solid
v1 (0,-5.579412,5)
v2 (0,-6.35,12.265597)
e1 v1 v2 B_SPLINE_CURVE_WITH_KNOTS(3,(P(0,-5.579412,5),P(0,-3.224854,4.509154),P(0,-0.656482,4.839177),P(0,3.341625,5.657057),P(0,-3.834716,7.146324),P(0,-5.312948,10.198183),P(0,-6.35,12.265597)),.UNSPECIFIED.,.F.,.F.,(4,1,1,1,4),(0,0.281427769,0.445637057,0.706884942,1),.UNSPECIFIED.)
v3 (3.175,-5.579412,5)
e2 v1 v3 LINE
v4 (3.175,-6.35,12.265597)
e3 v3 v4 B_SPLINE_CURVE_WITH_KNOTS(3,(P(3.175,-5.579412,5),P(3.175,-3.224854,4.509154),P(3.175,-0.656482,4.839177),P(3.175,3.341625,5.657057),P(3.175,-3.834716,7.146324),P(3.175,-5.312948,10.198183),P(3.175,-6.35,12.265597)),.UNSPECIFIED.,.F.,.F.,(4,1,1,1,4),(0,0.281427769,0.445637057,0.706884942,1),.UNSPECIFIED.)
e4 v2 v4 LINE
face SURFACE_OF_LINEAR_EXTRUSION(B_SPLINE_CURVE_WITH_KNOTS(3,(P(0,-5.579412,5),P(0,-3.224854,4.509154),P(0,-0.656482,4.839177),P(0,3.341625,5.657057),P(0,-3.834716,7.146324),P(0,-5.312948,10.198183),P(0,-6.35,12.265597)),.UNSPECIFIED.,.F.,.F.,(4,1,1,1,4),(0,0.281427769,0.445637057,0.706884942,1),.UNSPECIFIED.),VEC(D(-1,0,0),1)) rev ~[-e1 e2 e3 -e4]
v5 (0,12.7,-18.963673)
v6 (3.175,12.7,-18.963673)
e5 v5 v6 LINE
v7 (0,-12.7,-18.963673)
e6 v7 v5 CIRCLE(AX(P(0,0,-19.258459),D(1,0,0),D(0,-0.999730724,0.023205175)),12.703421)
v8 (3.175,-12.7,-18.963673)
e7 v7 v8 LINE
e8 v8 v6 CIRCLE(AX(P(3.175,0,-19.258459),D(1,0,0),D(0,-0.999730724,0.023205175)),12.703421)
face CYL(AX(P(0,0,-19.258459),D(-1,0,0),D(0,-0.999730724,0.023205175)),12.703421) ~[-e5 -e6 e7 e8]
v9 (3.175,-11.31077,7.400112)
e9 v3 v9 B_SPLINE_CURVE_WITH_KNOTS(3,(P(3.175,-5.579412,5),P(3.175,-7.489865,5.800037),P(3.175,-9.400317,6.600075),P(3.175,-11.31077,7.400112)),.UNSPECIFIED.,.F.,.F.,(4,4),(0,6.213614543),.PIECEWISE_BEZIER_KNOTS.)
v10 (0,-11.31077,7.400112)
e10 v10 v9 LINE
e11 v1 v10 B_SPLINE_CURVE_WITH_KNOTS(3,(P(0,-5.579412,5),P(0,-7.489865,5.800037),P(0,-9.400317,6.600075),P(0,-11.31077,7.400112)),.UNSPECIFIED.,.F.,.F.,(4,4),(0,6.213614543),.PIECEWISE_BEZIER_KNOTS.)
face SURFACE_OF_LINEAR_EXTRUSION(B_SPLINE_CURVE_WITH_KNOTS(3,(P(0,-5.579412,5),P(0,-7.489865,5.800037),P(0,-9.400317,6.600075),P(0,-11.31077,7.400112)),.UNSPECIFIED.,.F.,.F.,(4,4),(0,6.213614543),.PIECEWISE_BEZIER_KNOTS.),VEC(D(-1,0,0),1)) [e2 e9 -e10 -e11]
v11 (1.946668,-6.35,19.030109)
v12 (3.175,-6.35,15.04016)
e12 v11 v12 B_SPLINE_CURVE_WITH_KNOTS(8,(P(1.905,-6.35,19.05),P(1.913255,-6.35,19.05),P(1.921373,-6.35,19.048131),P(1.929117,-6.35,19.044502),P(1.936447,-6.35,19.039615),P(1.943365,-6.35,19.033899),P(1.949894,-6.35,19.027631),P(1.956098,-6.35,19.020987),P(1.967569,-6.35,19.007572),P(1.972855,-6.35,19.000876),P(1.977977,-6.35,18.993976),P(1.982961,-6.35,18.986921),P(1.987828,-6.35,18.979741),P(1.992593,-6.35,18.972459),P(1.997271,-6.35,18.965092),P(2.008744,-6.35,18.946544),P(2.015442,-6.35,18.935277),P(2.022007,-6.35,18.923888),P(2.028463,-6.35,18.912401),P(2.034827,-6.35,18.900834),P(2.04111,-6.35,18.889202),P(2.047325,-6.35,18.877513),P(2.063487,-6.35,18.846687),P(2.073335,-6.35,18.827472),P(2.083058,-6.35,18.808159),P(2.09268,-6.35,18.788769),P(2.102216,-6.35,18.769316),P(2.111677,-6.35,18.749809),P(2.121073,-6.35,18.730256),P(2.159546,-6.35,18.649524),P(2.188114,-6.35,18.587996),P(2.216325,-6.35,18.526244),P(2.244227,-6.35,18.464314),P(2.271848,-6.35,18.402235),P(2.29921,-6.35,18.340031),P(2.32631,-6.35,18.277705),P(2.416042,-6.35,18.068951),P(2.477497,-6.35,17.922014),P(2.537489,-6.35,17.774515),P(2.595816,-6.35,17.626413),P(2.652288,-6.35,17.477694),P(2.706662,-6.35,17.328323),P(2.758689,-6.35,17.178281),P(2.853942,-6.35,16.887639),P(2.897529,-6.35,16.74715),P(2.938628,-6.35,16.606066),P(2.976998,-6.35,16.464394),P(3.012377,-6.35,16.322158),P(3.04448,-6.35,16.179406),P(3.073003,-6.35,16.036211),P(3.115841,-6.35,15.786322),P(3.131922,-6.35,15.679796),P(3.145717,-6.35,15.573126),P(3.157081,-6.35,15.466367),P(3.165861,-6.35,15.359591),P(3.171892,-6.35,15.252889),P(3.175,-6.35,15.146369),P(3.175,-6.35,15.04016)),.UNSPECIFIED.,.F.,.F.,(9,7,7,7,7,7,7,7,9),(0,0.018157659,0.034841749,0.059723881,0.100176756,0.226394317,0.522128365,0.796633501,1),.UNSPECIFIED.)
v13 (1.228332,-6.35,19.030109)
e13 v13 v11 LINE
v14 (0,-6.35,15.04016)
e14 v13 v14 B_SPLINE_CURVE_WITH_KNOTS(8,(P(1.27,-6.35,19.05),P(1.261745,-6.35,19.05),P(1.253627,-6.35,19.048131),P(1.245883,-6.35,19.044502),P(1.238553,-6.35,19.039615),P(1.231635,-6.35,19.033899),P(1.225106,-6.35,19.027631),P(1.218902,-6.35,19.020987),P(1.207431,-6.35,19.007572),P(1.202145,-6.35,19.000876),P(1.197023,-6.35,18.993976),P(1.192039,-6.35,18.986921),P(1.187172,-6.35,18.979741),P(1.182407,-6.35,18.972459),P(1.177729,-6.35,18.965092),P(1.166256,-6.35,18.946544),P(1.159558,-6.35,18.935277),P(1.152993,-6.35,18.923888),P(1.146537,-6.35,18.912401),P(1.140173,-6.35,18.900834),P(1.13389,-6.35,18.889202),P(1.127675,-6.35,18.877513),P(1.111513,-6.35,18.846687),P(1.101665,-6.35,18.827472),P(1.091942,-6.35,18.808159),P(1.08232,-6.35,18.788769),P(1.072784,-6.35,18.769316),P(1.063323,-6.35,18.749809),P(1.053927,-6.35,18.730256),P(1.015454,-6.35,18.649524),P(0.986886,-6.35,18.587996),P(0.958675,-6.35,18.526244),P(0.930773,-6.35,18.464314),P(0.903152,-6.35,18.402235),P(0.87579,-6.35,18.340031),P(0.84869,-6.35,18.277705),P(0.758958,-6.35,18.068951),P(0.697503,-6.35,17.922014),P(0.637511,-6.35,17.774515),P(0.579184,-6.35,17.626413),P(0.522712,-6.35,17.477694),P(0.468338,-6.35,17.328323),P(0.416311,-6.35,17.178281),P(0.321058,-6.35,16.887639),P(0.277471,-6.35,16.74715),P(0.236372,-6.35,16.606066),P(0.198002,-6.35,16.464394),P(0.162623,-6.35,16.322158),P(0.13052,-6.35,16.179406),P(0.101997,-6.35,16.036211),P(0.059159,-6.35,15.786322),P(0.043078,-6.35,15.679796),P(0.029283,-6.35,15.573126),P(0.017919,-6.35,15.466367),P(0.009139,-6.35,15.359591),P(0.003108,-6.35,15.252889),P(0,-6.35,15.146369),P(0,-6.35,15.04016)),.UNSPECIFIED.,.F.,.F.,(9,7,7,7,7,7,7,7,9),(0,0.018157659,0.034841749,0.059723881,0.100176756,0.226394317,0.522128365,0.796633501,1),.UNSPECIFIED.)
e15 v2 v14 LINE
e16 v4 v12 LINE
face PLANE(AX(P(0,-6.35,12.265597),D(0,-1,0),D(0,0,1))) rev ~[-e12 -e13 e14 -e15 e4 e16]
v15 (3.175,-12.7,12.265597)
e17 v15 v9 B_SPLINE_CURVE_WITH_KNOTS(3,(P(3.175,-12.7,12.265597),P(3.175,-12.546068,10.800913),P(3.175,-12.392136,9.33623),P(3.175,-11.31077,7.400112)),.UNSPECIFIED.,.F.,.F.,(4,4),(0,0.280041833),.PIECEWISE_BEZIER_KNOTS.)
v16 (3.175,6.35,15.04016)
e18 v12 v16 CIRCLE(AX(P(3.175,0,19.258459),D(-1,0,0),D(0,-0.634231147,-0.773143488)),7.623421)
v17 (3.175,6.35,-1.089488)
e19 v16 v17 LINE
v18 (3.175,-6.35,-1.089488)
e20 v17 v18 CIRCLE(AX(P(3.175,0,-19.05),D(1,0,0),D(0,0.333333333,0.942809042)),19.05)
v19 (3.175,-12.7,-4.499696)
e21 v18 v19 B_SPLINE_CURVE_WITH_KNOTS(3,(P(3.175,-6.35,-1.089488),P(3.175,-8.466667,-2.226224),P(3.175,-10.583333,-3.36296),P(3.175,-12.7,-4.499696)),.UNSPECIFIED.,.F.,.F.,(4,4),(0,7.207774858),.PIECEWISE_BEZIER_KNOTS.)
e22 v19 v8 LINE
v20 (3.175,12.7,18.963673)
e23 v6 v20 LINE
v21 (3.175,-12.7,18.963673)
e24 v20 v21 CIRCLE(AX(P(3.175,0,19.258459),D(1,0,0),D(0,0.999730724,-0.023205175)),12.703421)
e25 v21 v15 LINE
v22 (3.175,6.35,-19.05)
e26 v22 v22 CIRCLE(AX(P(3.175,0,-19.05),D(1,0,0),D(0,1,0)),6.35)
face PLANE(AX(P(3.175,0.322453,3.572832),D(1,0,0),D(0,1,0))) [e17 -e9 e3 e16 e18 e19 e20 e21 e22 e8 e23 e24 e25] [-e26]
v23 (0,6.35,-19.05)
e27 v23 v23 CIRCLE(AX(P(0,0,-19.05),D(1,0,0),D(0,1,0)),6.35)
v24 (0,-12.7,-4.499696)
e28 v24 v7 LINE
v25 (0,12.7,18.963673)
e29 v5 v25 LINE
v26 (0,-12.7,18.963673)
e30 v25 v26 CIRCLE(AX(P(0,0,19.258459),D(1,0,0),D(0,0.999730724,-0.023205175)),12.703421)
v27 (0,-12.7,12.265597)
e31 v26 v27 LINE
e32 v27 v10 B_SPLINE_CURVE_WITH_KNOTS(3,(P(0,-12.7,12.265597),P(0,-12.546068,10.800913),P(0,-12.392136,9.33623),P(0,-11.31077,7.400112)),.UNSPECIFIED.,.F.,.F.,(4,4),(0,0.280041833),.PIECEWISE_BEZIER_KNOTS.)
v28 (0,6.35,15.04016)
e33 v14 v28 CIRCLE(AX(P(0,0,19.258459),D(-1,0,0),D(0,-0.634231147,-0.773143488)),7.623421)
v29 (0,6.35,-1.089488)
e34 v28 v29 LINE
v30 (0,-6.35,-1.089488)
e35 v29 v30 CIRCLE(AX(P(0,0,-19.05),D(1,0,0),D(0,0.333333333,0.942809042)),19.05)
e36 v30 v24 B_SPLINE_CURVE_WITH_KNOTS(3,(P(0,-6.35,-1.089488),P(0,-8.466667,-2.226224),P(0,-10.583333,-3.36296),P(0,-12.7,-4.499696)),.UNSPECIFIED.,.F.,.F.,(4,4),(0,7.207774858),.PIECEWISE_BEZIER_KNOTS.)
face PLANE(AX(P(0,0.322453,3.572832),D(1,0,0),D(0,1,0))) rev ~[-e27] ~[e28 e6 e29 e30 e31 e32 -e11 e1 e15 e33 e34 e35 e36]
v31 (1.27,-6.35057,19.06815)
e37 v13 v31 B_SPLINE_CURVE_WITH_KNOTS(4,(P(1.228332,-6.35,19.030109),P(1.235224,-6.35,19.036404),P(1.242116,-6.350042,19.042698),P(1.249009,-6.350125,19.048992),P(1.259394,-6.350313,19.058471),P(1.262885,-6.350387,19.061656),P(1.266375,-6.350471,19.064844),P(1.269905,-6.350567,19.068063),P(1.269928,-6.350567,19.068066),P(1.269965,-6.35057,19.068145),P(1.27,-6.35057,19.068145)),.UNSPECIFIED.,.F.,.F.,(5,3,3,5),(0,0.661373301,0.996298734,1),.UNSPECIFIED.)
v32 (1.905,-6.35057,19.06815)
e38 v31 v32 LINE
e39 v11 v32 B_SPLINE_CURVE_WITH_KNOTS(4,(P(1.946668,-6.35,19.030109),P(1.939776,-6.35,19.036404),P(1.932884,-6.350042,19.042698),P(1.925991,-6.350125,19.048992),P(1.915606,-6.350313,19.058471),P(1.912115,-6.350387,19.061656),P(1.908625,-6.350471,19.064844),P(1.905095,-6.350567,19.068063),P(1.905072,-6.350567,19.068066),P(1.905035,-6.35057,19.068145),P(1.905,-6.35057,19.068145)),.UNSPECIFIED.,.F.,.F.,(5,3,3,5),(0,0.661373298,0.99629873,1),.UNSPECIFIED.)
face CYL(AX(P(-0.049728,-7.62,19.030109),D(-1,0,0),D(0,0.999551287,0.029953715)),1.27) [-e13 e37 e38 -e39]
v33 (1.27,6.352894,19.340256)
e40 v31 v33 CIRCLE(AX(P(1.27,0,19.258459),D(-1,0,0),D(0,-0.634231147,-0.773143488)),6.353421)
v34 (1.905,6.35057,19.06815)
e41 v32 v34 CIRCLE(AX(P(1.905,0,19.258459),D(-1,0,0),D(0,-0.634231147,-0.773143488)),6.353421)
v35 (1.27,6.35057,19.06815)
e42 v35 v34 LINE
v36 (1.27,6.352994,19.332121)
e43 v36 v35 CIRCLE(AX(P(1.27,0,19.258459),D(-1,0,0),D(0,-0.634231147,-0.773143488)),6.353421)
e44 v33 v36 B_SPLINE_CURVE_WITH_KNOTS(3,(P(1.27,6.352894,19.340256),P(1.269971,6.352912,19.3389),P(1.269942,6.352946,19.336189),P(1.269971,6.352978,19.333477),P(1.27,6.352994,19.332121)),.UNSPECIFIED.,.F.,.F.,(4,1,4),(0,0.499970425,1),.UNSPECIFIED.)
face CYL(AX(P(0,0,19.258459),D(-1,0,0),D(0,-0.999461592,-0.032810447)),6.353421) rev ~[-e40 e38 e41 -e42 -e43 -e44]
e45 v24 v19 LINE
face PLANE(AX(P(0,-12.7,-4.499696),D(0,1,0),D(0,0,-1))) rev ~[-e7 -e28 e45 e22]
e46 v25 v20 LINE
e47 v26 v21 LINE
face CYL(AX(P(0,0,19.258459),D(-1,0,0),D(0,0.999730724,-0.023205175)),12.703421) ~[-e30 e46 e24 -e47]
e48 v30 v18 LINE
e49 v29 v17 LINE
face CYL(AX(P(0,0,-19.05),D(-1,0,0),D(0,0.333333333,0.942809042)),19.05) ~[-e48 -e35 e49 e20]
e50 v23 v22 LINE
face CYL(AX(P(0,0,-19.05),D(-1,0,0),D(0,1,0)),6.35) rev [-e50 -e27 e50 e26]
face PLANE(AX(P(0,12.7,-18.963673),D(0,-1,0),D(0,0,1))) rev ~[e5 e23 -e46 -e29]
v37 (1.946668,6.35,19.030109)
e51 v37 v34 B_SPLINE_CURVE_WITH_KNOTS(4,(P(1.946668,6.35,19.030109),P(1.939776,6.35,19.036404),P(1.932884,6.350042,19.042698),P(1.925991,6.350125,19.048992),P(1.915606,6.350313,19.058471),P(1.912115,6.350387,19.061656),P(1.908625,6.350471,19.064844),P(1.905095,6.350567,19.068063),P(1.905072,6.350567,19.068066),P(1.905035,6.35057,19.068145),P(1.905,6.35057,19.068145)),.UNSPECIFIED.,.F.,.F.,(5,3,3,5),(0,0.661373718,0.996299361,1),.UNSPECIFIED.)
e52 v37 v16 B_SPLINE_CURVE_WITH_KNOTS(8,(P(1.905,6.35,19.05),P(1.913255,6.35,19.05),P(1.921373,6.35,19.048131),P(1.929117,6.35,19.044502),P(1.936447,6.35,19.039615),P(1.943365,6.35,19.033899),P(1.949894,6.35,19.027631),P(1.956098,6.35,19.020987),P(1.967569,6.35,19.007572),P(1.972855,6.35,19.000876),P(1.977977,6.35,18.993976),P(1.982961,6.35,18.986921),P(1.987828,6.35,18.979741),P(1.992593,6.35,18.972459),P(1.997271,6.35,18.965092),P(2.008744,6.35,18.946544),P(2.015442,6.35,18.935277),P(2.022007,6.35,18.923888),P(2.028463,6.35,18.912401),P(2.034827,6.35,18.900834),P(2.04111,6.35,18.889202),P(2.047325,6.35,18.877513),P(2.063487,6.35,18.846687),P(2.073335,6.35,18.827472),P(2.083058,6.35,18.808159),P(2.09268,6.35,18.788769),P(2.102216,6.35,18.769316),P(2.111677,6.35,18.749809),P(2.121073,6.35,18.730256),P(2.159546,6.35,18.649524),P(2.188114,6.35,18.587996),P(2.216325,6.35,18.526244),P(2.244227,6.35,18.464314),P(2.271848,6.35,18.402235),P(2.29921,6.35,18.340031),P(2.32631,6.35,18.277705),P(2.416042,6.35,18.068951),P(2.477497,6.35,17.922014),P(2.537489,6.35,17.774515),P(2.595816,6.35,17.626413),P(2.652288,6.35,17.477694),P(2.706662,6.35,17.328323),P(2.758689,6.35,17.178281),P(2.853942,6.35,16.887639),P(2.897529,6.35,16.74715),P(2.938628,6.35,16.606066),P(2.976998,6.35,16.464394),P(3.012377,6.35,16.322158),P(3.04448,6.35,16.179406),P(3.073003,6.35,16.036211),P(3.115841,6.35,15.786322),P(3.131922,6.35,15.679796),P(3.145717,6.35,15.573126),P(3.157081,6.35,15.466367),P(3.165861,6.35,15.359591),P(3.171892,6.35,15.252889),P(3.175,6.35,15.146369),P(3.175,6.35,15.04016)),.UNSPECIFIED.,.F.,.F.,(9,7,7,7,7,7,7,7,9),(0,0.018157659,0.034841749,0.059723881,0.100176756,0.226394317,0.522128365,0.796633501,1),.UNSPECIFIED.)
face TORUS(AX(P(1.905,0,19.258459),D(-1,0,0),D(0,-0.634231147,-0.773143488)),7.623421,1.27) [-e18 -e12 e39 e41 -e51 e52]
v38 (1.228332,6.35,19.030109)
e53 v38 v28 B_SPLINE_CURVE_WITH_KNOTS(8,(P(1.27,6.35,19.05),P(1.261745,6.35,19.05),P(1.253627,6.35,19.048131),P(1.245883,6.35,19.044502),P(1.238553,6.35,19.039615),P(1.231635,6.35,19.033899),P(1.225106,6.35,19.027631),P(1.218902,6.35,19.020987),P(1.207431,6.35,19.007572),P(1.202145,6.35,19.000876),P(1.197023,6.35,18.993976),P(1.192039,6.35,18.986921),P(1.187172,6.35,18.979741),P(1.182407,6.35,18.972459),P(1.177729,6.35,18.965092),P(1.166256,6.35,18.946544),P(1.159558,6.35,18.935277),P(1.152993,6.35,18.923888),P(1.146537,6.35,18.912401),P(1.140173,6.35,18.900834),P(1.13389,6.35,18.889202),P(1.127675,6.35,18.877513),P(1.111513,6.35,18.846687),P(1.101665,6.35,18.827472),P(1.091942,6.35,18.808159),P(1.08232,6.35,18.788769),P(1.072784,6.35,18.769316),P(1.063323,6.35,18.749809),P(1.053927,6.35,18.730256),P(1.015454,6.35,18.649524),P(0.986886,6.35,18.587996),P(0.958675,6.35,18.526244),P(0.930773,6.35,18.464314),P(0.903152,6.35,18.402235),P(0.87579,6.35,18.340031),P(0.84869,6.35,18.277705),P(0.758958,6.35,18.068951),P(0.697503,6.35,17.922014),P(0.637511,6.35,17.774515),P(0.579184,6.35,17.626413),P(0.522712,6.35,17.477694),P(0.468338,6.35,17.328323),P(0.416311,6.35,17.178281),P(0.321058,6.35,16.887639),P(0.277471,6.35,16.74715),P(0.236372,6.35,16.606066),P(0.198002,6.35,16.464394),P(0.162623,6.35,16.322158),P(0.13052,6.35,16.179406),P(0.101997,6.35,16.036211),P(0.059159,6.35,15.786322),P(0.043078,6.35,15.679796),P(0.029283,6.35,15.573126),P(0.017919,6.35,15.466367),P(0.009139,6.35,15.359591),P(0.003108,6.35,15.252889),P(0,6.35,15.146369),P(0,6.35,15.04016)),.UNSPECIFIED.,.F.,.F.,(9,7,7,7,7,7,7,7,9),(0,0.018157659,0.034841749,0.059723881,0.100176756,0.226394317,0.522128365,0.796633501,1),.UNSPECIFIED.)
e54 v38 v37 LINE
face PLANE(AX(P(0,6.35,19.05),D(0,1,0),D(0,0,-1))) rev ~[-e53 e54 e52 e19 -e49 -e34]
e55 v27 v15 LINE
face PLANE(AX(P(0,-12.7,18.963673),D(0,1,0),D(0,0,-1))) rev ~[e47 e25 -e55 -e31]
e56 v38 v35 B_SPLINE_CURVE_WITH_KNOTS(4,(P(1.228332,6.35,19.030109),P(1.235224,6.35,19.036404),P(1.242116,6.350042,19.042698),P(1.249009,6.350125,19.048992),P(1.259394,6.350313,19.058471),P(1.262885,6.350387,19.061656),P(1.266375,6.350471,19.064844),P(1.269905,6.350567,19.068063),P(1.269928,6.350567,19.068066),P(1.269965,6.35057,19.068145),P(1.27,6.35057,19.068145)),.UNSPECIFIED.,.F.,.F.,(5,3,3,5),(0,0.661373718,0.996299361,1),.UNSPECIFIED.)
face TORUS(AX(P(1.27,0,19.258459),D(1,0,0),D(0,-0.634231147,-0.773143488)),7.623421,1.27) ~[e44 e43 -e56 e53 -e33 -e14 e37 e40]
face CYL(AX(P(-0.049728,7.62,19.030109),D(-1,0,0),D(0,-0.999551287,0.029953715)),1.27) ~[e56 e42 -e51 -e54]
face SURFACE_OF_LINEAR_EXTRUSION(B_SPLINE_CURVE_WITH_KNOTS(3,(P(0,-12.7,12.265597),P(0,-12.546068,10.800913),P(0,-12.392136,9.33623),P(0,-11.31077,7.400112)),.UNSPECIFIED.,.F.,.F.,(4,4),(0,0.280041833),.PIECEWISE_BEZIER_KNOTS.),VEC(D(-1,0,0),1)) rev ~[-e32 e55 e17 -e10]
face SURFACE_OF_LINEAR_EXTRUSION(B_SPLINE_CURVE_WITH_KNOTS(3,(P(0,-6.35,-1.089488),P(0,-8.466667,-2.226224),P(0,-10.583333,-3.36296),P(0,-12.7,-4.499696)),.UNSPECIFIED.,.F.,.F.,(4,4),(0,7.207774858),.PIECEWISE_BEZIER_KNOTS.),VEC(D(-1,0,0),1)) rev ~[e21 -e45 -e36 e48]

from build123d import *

# Parameters (mm, degrees)
F0_R        = 6.35
F1_DEPTH    = 3.175
F2_T1_DEPTH = 3.2744561413
F2_T4_ANGLE = 281.2740332969
F2_T6_ANGLE = 281.2740332969


# Not quite as in the source:
# - a fillet or chamfer that OpenCascade refuses, or shapes differently, is made with other operations: its cross-section is extruded or revolved along the edge and cut away or added


with BuildPart() as f1:
    # F0 (on Right) → F1 (new body)
    with BuildSketch(Plane.YZ):
        with BuildLine():
            Line((6.35, 19.05), (6.35, -1.0894877579))
            ThreePointArc((6.35, -1.0894877579), (0, 0), (-6.35, -1.0894877579))
            add(Edge.make_bspline(
                [(-6.35, -1.0894877579), (-8.4666666667, -2.2262237484), (-10.5833333333, -3.3629597389), (-12.7, -4.4996957295)],
                knots=[0, 0, 0, 0, 7.2077748584, 7.2077748584, 7.2077748584, 7.2077748584], degree=3))
            Line((-12.7, -4.4996957295), (-12.7, -18.9636734782))
            ThreePointArc((-12.7, -18.9636734782), (0, -31.9618793041), (12.7, -18.9636734782))
            Line((12.7, -18.9636734782), (12.7, 18.9636734782))
            ThreePointArc((12.7, 18.9636734782), (0, 31.9618793041), (-12.7, 18.9636734782))
            Line((-12.7, 18.9636734782), (-12.7, 12.2655965388))
            add(Edge.make_bspline(
                [(-12.7, 12.2655965388), (-12.5460680886, 10.8009133444), (-12.3921361771, 9.3362301501), (-11.3107701764, 7.4001117609)],
                knots=[0, 0, 0, 0, 0.2800418332, 0.2800418332, 0.2800418332, 0.2800418332], degree=3))
            add(Edge.make_bspline(
                [(-5.5794117662, 5), (-7.4898645696, 5.8000372536), (-9.400317373, 6.6000745073), (-11.3107701764, 7.4001117609)],
                knots=[0, 0, 0, 0, 6.2136145432, 6.2136145432, 6.2136145432, 6.2136145432], degree=3))
            add(Edge.make_bspline(
                [(-5.5794117662, 5), (-5.5956610435, 6.8858619014), (-5.9728305218, 9.5757292201), (-6.35, 12.2655965388)],
                knots=[0.7796078974, 0.7796078974, 0.7796078974, 0.7796078974, 1, 1, 1, 1], degree=3))
            Line((-6.35, 12.2655965388), (-6.35, 19.05))
            ThreePointArc((-6.35, 19.05), (0, 25.6118793041), (6.35, 19.05))
        make_face()
        with Locations((0, -19.05)):
            Circle(F0_R, mode=Mode.SUBTRACT)
        with BuildLine():
            add(Edge.make_bspline(
                [(-5.5794117662, 5), (-3.2248544463, 4.5091538123), (-0.6564824192, 4.8391769932), (3.3416252338, 5.6570567656), (-3.834716226, 7.1463236629), (-5.3129484548, 10.1981831131), (-6.35, 12.2655965388)],
                knots=[0, 0, 0, 0, 0.2814277691, 0.4456370567, 0.7068849416, 1, 1, 1, 1], degree=3))
            add(Edge.make_bspline(
                [(-5.5794117662, 5), (-5.5956610435, 6.8858619014), (-5.9728305218, 9.5757292201), (-6.35, 12.2655965388)],
                knots=[0.7796078974, 0.7796078974, 0.7796078974, 0.7796078974, 1, 1, 1, 1], degree=3))
        make_face()
    extrude(amount=F1_DEPTH)

    # F2: fillet of radius 1.27 on 4 edges, made by hand

    # F2_s2 → F2_t1 (cut)
    with BuildSketch(Plane.YZ.offset(-0.0497280707)):
        with BuildLine():
            ThreePointArc((-6.3505698659, 19.0681499948), (-6.3501424745, 19.0491315173), (-6.35, 19.0301087717))
            Line((-6.35, 19.0301087717), (-6.35, 19.05))
            ThreePointArc((-6.35, 19.05), (-6.3502914173, 19.0590747938), (-6.3505698659, 19.0681499948))
        make_face()
        with BuildLine():
            ThreePointArc((6.3505698659, 19.0681499948), (6.3501424745, 19.0491315173), (6.35, 19.0301087717))
            Line((6.35, 19.0301087717), (6.35, 19.05))
            ThreePointArc((6.35, 19.05), (6.3502914173, 19.0590747938), (6.3505698659, 19.0681499948))
        make_face()
    extrude(amount=F2_T1_DEPTH, mode=Mode.SUBTRACT)

    # F2_s3 → F2_t4 (revolve, cut)
    with BuildSketch(Plane(origin=(0, -9.4434175303, 7.7466985416), x_dir=(1, 0, 0), z_dir=(0, 0.7731434877, -0.6342311467))):
        with BuildLine():
            ThreePointArc((1.27, -8.5361310993), (0.3719743879, -8.1641567114), (0, -7.2661310993))
            Line((0, -7.2661310993), (0, -8.5361310993))
            Line((0, -8.5361310993), (1.27, -8.5361310993))
        make_face()
    revolve(axis=Axis((0, 0, 19.2584585737), (-1, 0, 0)), revolution_arc=F2_T4_ANGLE, mode=Mode.SUBTRACT)

    # F2_s5 → F2_t6 (revolve, cut)
    with BuildSketch(Plane(origin=(0, -9.4434175303, 7.7466985416), x_dir=(1, 0, 0), z_dir=(0, 0.7731434877, -0.6342311467))):
        with BuildLine():
            ThreePointArc((1.905, -8.5361310993), (2.8030256121, -8.1641567114), (3.175, -7.2661310993))
            Line((3.175, -7.2661310993), (3.175, -8.5361310993))
            Line((3.175, -8.5361310993), (1.905, -8.5361310993))
        make_face()
    revolve(axis=Axis((3.175, 0, 19.2584585737), (-1, 0, 0)), revolution_arc=F2_T6_ANGLE, mode=Mode.SUBTRACT)


solid = f1.part
